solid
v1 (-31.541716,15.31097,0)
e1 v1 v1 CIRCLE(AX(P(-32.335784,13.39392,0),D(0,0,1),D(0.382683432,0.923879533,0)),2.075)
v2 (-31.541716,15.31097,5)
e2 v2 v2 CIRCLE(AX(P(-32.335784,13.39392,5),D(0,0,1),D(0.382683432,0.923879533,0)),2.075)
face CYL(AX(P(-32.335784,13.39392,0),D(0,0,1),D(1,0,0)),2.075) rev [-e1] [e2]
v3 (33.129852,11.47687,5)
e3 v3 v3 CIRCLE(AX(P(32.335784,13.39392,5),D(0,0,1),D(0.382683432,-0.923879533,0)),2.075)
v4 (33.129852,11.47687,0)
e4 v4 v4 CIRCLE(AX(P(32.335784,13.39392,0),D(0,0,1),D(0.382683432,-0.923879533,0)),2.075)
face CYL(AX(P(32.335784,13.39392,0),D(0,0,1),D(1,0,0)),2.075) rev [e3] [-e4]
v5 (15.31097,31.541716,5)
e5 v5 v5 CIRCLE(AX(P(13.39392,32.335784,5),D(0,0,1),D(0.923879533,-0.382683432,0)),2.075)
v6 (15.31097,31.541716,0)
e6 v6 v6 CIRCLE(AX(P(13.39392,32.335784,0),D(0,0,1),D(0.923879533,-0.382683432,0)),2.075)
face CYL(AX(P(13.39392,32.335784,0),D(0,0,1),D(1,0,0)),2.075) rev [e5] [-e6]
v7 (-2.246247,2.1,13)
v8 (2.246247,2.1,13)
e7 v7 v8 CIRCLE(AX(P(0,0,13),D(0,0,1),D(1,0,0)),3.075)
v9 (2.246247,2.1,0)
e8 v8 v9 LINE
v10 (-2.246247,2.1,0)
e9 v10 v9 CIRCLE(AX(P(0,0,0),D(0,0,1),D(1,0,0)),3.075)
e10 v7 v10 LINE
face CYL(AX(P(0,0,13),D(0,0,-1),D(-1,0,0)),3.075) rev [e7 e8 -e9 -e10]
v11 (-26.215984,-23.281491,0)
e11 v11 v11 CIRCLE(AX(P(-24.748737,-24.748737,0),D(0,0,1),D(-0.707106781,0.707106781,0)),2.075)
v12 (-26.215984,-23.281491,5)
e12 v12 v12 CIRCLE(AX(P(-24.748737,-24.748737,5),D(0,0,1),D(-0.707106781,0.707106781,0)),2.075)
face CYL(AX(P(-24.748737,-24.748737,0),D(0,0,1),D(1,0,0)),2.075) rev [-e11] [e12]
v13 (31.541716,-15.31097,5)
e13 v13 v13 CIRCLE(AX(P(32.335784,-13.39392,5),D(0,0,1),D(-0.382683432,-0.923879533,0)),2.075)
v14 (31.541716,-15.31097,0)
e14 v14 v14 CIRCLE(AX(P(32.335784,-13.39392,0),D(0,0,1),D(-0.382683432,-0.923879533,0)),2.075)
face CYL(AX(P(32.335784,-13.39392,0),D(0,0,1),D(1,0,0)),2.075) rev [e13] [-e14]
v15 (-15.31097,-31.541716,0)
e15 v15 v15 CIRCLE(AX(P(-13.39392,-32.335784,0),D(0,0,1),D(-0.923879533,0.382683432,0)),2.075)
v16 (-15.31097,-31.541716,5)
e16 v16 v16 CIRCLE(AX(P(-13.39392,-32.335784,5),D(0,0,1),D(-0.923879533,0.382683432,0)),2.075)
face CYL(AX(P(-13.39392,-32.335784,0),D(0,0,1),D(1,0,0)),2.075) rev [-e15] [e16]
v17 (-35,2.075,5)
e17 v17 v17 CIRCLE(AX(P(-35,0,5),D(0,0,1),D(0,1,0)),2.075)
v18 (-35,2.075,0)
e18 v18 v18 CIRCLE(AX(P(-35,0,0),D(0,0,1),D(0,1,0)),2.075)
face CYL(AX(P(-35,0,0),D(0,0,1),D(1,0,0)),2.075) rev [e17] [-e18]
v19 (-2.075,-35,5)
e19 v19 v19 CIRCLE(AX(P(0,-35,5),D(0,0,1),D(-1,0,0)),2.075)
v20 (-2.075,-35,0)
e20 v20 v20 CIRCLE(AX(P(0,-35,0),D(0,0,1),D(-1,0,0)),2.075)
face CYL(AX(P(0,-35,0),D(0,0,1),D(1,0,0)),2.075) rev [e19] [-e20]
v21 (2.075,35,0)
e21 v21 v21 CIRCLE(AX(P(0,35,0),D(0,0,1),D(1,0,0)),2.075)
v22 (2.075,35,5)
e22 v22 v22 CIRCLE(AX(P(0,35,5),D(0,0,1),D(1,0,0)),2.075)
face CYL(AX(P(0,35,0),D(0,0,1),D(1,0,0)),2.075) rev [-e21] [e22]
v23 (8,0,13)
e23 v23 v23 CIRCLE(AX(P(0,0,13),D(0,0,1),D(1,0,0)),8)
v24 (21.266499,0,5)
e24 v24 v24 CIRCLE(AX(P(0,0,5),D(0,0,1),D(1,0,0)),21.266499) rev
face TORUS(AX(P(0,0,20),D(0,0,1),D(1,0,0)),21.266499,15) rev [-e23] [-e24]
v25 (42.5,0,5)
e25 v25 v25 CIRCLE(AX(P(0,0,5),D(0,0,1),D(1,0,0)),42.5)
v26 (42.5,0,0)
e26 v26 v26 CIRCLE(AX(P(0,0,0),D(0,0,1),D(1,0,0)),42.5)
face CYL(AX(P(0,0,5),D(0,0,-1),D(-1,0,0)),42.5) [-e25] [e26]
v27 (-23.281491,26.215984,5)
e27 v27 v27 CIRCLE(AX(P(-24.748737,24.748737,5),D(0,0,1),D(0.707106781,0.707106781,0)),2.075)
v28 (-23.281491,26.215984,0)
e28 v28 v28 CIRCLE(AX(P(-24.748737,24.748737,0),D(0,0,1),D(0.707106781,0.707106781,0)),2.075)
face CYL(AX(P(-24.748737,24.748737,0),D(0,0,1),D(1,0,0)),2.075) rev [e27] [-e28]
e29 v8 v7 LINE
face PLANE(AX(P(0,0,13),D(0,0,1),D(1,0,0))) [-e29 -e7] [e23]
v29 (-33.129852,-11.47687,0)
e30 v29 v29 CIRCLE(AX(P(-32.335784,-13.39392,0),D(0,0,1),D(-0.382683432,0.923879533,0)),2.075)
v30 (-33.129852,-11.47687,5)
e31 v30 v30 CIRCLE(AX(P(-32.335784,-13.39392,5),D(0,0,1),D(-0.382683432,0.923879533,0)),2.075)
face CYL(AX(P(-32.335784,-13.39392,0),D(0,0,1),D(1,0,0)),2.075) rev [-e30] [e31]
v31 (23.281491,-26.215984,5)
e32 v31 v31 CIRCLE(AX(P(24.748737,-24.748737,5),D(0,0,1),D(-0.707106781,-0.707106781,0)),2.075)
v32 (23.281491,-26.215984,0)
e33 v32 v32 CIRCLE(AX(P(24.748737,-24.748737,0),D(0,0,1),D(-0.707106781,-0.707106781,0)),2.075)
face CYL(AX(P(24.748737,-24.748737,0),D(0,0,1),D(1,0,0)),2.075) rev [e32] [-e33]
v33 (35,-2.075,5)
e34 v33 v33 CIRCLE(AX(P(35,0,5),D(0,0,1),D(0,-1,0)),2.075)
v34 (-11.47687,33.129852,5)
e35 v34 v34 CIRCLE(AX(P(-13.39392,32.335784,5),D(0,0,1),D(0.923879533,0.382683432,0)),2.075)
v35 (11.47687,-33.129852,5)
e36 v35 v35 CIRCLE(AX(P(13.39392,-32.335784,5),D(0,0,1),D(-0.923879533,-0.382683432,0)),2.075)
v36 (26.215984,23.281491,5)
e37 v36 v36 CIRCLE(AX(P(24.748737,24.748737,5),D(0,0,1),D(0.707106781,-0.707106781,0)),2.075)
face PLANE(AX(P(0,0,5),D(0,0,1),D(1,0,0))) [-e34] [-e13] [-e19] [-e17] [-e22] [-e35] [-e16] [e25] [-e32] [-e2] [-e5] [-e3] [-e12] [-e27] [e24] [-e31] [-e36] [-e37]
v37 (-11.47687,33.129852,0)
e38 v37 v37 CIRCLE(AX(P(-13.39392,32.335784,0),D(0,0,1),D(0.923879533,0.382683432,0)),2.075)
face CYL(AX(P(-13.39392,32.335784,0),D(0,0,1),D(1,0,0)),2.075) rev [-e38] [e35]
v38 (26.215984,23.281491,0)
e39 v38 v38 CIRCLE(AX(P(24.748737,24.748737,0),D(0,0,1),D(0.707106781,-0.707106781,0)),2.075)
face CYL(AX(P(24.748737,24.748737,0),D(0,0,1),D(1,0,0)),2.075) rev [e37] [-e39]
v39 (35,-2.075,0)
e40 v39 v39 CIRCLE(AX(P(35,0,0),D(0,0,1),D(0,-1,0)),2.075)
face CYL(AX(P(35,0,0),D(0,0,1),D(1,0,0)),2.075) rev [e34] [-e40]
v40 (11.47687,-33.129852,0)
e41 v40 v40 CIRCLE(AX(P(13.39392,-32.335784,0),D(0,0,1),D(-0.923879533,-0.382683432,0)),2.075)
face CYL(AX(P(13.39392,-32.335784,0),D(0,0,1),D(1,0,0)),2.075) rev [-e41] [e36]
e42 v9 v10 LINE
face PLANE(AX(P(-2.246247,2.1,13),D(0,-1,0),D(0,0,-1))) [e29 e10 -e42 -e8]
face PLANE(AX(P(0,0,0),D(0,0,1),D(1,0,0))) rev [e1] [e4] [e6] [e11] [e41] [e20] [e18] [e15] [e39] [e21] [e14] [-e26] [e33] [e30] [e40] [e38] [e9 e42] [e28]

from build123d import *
from build123d.topology import SkipClean

# Parameters (mm, degrees)
ESBO_O1_R                = 42.5
RESSALTO_EXTRUS_O1_DEPTH = 5
ESBO_O2_R                = 8
RESSALTO_EXTRUS_O2_DEPTH = 8
FILETE3_R                = 15
ESBO_O3_R                = 2.075
CORTE_EXTRUS_O1_DEPTH    = 61.634148794
PADR_OCIRCULAR1_COUNT    = 16
CORTE_EXTRUS_O2_DEPTH    = 61.634148794


with BuildPart() as part:
    # Esboço1 → Ressalto-extrusão1 (new body)
    with BuildSketch(Plane.XY):
        Circle(ESBO_O1_R)
    extrude(amount=RESSALTO_EXTRUS_O1_DEPTH)

    # Esboço2 → Ressalto-extrusão2 (add)
    with BuildSketch(Plane.XY.offset(5)):
        Circle(ESBO_O2_R)
        with BuildLine():
            Line((-2.24624687, 2.1), (2.24624687, 2.1))
            ThreePointArc((2.24624687, 2.1), (0, -3.075), (-2.24624687, 2.1))
        make_face(mode=Mode.SUBTRACT)
    extrude(amount=RESSALTO_EXTRUS_O2_DEPTH)

    # Filete3
    # the kernel refuses this fillet: 15 mm, written as the material it adds along each edge
    with BuildSketch(Plane(origin=(0, 0, 5), x_dir=(1, 0, 0), z_dir=(0, -1, 0))) as filete3_piece_1:
        with BuildLine():
            CenterArc((21.266499161, 15), FILETE3_R, 207.818139285, 62.181860715)
            Line((8, 8), (7.734670017, 7.86))
            ThreePointArc((7.734670017, 7.86), (7.7, 4), (7.7, 0))
            Line((7.7, 0), (8, -0.3))
            Line((8, -0.3), (21.266499161, -0.3))
            Line((21.266499161, -0.3), (21.266499161, 0))
        make_face()
    revolve(axis=Axis((0, 0, 5), (0, 0, 1)))

    # Esboço3 → Corte-extrusão1 (cut, through all)
    with BuildSketch(Plane.XY.offset(5)):
        with Locations((0, 35)):
            Circle(ESBO_O3_R)
    corte_extrus_o1 = extrude(amount=-CORTE_EXTRUS_O1_DEPTH, mode=Mode.SUBTRACT)

    # PadrãoCircular1: Corte-extrusão1 ×16 about axis
    padr_ocircular1_axis = Axis((0, 0, 0), (0, 0, 1))
    for i in range(1, PADR_OCIRCULAR1_COUNT):
        add(corte_extrus_o1.rotate(padr_ocircular1_axis, i * 360 / PADR_OCIRCULAR1_COUNT), mode=Mode.SUBTRACT)

    # Esboço4 → Corte-extrusão2 (cut, through all)
    with SkipClean():  # the faces are left unmerged after this step: merging them gives an invalid solid
        with BuildSketch(Plane.XY.offset(5)):
            with BuildLine():
                Line((2.24624687, 2.1), (-2.24624687, 2.1))
                ThreePointArc((-2.24624687, 2.1), (0, -3.075), (2.24624687, 2.1))
            make_face()
        extrude(amount=-CORTE_EXTRUS_O2_DEPTH, mode=Mode.SUBTRACT)
    add(part.part.scale(1), mode=Mode.REPLACE)  # the faces are merged on a copy


solid = part.part
